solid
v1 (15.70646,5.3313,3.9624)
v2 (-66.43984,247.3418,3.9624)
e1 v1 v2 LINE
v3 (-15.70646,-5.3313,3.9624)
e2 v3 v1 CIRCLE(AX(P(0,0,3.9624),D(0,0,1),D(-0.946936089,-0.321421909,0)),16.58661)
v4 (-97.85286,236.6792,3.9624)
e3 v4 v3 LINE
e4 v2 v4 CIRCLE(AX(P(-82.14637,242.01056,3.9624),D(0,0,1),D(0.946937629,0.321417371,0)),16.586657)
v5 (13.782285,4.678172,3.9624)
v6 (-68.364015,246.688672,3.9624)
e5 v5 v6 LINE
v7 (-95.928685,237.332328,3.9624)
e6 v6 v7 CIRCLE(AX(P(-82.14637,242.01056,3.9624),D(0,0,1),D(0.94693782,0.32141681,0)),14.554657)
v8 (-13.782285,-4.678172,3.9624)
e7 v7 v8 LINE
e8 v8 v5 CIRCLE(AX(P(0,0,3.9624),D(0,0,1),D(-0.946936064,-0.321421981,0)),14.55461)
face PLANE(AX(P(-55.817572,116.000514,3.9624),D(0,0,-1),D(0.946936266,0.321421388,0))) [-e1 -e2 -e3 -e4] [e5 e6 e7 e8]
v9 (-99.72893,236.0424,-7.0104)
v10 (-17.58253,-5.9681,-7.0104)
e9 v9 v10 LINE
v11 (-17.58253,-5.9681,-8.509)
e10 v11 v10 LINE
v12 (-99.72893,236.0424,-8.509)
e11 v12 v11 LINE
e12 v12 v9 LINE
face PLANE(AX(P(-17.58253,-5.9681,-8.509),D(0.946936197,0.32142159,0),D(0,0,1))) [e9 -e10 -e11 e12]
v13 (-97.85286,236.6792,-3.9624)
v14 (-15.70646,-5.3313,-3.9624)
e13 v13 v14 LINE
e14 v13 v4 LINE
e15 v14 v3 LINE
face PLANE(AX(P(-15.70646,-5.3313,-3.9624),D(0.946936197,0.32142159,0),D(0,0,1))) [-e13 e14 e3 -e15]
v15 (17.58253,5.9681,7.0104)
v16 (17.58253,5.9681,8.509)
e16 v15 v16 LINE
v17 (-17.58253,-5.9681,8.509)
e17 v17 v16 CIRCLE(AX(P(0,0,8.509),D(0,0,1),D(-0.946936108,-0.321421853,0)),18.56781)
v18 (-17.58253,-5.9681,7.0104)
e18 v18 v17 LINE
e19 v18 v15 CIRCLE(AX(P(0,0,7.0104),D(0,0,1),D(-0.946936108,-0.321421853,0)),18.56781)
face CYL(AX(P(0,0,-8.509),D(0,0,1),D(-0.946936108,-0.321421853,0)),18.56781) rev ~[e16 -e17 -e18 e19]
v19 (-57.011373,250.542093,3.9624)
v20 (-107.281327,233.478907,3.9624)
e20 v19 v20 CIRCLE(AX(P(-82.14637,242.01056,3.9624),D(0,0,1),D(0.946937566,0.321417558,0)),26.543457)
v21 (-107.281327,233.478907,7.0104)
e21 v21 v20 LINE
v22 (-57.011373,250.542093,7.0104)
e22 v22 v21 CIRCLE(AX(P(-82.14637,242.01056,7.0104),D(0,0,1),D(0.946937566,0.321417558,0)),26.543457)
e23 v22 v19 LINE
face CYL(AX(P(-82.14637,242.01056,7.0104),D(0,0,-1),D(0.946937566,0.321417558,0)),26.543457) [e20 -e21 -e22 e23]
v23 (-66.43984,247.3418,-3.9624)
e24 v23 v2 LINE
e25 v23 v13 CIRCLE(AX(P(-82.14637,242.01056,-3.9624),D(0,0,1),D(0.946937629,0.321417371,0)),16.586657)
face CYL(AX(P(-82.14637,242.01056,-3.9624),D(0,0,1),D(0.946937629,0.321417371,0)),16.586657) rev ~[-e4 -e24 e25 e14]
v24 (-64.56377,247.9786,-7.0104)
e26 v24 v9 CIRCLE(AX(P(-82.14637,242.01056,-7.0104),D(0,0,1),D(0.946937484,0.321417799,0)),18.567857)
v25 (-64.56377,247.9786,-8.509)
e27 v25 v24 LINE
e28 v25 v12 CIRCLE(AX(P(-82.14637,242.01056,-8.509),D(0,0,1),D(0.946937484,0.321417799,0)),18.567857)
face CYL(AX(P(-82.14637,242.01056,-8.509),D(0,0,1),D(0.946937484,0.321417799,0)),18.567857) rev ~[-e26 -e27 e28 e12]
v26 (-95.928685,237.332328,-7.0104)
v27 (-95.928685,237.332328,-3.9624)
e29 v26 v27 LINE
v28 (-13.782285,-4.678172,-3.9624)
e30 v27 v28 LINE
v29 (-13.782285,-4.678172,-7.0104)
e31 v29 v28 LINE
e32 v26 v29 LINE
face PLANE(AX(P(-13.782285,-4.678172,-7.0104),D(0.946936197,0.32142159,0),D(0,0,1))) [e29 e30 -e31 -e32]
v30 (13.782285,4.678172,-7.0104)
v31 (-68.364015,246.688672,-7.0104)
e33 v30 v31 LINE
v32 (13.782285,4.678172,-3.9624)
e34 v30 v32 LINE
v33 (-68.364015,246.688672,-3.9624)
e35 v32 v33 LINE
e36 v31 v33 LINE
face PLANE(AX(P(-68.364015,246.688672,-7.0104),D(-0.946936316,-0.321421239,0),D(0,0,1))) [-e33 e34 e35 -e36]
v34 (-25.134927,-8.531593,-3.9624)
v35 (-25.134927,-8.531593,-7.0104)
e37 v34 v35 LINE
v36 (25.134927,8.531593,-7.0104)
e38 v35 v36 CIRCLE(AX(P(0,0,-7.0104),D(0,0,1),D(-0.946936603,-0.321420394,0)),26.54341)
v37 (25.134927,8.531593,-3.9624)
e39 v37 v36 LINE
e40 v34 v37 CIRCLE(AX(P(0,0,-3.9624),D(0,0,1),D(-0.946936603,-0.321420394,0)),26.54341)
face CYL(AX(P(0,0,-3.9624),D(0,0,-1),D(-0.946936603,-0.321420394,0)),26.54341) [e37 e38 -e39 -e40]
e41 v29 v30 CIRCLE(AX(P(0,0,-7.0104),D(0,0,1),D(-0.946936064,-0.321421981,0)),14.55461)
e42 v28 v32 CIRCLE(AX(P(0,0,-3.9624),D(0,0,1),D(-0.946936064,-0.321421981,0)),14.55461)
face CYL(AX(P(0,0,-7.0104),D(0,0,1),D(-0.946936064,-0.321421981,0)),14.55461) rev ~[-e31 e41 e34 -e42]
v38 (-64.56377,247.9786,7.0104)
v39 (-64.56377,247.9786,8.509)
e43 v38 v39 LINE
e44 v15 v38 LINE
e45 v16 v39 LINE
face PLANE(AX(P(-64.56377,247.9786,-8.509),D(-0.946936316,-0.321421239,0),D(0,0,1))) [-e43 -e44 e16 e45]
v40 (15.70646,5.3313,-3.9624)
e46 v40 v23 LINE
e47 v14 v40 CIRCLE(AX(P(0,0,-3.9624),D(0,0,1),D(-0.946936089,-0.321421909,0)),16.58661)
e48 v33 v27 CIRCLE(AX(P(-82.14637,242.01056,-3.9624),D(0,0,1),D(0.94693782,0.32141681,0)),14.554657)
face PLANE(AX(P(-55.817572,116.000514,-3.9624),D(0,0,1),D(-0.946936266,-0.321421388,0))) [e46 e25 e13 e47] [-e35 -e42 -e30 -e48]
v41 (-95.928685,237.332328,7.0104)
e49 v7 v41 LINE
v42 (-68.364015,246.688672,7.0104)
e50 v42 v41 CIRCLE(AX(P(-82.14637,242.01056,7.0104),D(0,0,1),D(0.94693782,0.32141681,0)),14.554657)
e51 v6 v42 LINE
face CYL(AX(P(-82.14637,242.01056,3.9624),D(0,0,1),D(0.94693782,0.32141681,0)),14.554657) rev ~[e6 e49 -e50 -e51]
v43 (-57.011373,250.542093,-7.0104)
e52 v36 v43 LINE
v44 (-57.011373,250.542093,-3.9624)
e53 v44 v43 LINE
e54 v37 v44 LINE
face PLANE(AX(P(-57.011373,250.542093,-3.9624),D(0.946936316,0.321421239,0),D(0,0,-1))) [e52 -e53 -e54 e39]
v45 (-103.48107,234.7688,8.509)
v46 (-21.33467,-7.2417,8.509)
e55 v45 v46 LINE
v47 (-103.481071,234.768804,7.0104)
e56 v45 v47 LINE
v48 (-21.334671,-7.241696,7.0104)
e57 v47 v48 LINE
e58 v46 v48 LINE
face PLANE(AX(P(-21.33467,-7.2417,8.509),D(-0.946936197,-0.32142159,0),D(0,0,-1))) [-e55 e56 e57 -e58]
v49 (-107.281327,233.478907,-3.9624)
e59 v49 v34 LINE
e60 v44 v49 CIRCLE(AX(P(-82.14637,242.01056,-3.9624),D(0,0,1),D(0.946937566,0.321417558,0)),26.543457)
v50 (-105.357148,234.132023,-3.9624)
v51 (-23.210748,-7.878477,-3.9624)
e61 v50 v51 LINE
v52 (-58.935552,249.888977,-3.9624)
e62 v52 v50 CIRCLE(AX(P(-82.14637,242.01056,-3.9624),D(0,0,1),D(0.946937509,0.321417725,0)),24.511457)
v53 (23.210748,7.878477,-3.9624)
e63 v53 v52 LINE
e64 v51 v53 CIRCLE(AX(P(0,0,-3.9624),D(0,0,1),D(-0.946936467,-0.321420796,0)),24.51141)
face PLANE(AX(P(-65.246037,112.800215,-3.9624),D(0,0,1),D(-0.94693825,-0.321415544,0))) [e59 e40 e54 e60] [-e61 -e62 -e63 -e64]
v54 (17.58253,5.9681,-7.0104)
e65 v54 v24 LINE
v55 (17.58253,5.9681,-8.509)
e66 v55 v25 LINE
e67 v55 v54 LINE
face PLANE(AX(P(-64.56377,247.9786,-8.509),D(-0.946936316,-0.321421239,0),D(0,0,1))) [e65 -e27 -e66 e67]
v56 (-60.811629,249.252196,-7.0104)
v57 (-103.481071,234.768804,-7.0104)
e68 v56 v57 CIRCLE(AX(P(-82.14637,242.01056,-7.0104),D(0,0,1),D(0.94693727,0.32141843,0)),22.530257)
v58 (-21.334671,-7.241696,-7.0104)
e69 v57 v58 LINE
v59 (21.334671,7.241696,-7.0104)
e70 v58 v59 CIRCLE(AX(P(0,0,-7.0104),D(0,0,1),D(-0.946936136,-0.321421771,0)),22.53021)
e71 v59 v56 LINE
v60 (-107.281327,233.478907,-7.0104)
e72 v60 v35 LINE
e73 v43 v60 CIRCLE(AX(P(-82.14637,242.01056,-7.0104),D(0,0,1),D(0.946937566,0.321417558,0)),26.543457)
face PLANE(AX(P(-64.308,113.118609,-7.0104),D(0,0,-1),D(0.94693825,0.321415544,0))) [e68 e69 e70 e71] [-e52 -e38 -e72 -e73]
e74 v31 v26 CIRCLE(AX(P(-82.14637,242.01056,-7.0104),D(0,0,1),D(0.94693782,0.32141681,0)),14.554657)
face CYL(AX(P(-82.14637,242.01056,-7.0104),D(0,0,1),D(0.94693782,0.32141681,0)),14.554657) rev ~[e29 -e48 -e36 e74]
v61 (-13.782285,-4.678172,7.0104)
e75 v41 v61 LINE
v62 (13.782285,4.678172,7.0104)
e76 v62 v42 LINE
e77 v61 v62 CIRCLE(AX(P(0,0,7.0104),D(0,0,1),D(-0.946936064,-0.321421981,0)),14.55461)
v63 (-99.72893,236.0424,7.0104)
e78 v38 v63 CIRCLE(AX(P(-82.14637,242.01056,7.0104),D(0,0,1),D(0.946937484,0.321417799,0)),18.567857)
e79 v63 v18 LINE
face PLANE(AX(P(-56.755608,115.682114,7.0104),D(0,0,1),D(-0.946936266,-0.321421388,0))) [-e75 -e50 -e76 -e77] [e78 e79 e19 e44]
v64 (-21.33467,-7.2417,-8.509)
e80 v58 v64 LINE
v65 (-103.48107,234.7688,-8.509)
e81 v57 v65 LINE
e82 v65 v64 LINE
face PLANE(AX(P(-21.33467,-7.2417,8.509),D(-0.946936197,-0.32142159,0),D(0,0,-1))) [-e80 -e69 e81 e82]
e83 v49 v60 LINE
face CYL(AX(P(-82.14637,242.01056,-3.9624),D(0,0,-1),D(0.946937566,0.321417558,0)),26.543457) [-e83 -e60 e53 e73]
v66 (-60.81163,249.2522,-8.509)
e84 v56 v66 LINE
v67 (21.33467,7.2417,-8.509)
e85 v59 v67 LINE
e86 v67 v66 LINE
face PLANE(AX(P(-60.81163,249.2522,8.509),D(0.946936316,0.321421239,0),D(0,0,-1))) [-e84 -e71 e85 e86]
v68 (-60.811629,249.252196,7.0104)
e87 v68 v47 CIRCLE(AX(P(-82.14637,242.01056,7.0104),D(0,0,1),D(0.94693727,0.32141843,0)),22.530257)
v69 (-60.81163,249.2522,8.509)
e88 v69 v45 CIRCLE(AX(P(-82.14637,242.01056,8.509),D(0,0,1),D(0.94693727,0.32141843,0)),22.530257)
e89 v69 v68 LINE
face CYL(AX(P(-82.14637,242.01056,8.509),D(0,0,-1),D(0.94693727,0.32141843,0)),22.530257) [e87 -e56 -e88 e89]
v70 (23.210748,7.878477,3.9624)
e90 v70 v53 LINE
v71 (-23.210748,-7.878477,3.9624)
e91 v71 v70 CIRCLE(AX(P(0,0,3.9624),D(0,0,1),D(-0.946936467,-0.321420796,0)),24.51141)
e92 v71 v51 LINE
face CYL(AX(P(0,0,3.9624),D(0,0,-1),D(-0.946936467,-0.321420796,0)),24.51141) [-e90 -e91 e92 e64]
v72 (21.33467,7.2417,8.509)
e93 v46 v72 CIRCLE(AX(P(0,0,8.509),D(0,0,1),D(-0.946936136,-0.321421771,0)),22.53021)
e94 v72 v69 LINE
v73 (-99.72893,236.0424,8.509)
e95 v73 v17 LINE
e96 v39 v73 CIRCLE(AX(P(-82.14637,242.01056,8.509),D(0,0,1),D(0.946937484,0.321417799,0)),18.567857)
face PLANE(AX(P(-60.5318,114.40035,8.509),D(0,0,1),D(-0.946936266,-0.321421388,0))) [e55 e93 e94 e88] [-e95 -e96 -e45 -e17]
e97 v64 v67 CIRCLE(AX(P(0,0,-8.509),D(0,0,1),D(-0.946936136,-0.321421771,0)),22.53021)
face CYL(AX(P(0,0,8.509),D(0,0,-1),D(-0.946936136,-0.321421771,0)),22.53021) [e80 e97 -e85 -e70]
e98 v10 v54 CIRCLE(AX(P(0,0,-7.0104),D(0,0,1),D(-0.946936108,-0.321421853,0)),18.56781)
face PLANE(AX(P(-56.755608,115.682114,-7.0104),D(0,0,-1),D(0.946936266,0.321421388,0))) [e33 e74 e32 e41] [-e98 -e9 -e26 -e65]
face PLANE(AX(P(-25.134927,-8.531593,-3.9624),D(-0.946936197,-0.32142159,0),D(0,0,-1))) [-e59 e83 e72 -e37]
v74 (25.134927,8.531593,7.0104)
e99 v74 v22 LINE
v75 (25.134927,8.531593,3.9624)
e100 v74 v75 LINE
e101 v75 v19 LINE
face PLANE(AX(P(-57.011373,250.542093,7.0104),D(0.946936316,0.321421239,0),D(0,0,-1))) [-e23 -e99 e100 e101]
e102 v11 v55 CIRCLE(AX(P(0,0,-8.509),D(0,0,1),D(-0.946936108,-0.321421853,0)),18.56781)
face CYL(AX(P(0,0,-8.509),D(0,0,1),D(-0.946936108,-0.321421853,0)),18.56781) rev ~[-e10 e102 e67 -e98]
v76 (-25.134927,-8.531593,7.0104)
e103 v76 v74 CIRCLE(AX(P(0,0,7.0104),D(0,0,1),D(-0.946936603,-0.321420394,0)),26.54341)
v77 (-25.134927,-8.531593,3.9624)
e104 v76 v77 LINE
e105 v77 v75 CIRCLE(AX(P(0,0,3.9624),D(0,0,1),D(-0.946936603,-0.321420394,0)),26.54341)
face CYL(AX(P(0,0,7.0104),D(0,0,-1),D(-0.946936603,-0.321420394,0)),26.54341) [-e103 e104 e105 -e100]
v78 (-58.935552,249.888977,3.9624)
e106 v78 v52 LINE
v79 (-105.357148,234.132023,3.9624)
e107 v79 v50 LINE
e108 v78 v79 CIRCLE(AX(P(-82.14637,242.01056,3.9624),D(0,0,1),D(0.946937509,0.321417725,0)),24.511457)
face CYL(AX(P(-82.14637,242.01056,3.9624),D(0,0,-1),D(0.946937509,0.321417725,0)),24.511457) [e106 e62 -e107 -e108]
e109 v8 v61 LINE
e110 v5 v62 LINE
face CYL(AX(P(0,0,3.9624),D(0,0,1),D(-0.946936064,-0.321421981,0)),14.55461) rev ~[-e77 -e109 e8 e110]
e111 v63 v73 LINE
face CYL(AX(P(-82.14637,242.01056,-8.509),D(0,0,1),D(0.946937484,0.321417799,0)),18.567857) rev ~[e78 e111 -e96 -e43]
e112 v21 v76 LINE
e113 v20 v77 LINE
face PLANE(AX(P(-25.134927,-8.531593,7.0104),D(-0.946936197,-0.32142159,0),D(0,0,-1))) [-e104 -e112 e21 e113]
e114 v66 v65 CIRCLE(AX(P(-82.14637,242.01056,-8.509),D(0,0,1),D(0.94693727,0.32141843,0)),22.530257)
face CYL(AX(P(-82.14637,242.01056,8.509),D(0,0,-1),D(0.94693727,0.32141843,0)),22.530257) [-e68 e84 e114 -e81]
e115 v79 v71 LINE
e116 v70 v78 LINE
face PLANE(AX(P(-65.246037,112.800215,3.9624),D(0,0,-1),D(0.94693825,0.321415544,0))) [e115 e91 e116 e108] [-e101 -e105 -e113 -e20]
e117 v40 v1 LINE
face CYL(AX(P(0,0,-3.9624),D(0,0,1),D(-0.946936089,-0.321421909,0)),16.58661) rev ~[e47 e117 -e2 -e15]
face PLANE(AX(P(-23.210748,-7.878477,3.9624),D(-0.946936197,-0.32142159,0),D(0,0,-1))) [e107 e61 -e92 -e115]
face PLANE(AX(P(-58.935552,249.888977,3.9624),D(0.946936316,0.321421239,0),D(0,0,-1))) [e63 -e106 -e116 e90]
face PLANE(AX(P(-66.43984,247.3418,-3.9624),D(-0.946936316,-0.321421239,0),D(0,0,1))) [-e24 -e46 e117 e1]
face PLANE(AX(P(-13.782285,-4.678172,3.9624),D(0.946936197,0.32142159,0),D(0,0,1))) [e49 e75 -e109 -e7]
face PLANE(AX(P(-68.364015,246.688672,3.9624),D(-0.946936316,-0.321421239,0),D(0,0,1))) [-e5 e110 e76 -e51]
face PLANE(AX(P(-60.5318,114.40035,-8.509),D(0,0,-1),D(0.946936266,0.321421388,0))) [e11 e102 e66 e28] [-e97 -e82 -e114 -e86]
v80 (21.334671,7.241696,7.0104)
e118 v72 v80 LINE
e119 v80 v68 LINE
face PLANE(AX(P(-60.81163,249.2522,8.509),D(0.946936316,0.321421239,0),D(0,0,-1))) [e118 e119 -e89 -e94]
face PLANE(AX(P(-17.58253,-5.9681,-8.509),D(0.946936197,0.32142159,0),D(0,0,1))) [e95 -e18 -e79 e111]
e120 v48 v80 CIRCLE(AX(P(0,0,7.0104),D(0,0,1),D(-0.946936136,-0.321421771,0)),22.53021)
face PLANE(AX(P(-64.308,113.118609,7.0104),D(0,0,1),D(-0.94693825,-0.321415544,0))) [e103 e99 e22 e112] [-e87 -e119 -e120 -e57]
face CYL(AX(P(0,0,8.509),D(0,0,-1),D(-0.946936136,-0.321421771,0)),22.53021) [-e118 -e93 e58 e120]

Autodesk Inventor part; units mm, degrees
ref_plane "Work Plane2" through (-82.1464, 242.0105, 0) normal (-1, 0, 0) x (0, 0, 1)
ref_plane "Work Plane3" through (0, 0, 0) normal (0.2348399, 0.9720341, 0) x (0, 0, 1)
sketch "Path" plane through (0, 0, 0) normal (0, 0, 1) x (1, 0, 0)
  arc A0 (-62.6877, 248.6154) -> (-101.605, 235.4056) centre (-82.1464, 242.0105) ccw
  arc A1 (-19.4586, -6.6049) -> (19.4586, 6.6049) centre (0, 0) ccw
  line L0 (-19.4586, -6.6049) -> (-101.605, 235.4056)
  line L1 (-62.6877, 248.6154) -> (19.4586, 6.6049)
  dimension "d31" = 11.9888
ref_plane "Section Plane" through (-101.605, 235.4056, 0) normal (0.3214214, -0.9469363, 0) x (0, 0, 1)
sketch "Section Sketch" plane through (-101.605, 235.4056, 0) normal (0.3214214, -0.9469363, 0) x (0, 0, 1)
  line L0 (-8.509, -1.9812) -> (8.509, -1.9812)
  line L1 (8.509, -1.9812) -> (8.509, 1.9812)
  line L2 (8.509, 1.9812) -> (-8.509, 1.9812)
  line L3 (-8.509, 1.9812) -> (-8.509, -1.9812)
  line L4 (-3.9624, -3.9624) -> (3.9624, -3.9624)
  line L5 (3.9624, -3.9624) -> (3.9624, 3.9624)
  line L6 (3.9624, 3.9624) -> (-3.9624, 3.9624)
  line L7 (-3.9624, 3.9624) -> (-3.9624, -3.9624)
  line L8 (-3.9624, 0) -> (3.9624, 0) construction
  line L9 (-7.0104, -5.9944) -> (-3.9624, -5.9944)
  line L10 (-3.9624, -5.9944) -> (-3.9624, 5.9944)
  line L11 (-3.9624, 5.9944) -> (-7.0104, 5.9944)
  line L12 (-7.0104, 5.9944) -> (-7.0104, -5.9944)
  line L13 (3.9624, -5.9944) -> (7.0104, -5.9944)
  line L14 (7.0104, -5.9944) -> (7.0104, 5.9944)
  line L15 (7.0104, 5.9944) -> (3.9624, 5.9944)
  line L16 (3.9624, 5.9944) -> (3.9624, -5.9944)
  line L17 (-8.509, 0) -> (8.509, 0) construction
  point P0 (0, 0)
  point P1 (0, 0)
  dimension "d21" = 3.9624
  dimension "d22" = 7.9248
  dimension "d23" = 7.9248
  dimension "d24" = 3.048
  dimension "d31" = 11.9888
  dimension "d32" = 17.018
sweep "Solid" add profiles "Section Sketch" path "Path"
pattern_of_one "Strand Pattern"
equation "\"d21\" = da_d2"
equation "\"d22\" = da_d1"
equation "\"d23\" = da_b1"
equation "\"d24\" = da_t1 + da_t2"
equation "\"d30\" = da_pt"
equation "\"da_p\" = 12.7"
equation "\"da_b1\" = 7.9248"
equation "\"da_h2\" = 11.9888"
equation "\"da_h3\" = 10.3886"
equation "\"da_d1\" = 7.9248"
equation "\"da_d2\" = 3.9624"
equation "\"da_pt\" = 14.3764"
equation "\"da_b\" = 17.018"
equation "\"da_t1\" = 1.524"
equation "\"da_t2\" = 1.524"
properties part number "Roller Chain"
